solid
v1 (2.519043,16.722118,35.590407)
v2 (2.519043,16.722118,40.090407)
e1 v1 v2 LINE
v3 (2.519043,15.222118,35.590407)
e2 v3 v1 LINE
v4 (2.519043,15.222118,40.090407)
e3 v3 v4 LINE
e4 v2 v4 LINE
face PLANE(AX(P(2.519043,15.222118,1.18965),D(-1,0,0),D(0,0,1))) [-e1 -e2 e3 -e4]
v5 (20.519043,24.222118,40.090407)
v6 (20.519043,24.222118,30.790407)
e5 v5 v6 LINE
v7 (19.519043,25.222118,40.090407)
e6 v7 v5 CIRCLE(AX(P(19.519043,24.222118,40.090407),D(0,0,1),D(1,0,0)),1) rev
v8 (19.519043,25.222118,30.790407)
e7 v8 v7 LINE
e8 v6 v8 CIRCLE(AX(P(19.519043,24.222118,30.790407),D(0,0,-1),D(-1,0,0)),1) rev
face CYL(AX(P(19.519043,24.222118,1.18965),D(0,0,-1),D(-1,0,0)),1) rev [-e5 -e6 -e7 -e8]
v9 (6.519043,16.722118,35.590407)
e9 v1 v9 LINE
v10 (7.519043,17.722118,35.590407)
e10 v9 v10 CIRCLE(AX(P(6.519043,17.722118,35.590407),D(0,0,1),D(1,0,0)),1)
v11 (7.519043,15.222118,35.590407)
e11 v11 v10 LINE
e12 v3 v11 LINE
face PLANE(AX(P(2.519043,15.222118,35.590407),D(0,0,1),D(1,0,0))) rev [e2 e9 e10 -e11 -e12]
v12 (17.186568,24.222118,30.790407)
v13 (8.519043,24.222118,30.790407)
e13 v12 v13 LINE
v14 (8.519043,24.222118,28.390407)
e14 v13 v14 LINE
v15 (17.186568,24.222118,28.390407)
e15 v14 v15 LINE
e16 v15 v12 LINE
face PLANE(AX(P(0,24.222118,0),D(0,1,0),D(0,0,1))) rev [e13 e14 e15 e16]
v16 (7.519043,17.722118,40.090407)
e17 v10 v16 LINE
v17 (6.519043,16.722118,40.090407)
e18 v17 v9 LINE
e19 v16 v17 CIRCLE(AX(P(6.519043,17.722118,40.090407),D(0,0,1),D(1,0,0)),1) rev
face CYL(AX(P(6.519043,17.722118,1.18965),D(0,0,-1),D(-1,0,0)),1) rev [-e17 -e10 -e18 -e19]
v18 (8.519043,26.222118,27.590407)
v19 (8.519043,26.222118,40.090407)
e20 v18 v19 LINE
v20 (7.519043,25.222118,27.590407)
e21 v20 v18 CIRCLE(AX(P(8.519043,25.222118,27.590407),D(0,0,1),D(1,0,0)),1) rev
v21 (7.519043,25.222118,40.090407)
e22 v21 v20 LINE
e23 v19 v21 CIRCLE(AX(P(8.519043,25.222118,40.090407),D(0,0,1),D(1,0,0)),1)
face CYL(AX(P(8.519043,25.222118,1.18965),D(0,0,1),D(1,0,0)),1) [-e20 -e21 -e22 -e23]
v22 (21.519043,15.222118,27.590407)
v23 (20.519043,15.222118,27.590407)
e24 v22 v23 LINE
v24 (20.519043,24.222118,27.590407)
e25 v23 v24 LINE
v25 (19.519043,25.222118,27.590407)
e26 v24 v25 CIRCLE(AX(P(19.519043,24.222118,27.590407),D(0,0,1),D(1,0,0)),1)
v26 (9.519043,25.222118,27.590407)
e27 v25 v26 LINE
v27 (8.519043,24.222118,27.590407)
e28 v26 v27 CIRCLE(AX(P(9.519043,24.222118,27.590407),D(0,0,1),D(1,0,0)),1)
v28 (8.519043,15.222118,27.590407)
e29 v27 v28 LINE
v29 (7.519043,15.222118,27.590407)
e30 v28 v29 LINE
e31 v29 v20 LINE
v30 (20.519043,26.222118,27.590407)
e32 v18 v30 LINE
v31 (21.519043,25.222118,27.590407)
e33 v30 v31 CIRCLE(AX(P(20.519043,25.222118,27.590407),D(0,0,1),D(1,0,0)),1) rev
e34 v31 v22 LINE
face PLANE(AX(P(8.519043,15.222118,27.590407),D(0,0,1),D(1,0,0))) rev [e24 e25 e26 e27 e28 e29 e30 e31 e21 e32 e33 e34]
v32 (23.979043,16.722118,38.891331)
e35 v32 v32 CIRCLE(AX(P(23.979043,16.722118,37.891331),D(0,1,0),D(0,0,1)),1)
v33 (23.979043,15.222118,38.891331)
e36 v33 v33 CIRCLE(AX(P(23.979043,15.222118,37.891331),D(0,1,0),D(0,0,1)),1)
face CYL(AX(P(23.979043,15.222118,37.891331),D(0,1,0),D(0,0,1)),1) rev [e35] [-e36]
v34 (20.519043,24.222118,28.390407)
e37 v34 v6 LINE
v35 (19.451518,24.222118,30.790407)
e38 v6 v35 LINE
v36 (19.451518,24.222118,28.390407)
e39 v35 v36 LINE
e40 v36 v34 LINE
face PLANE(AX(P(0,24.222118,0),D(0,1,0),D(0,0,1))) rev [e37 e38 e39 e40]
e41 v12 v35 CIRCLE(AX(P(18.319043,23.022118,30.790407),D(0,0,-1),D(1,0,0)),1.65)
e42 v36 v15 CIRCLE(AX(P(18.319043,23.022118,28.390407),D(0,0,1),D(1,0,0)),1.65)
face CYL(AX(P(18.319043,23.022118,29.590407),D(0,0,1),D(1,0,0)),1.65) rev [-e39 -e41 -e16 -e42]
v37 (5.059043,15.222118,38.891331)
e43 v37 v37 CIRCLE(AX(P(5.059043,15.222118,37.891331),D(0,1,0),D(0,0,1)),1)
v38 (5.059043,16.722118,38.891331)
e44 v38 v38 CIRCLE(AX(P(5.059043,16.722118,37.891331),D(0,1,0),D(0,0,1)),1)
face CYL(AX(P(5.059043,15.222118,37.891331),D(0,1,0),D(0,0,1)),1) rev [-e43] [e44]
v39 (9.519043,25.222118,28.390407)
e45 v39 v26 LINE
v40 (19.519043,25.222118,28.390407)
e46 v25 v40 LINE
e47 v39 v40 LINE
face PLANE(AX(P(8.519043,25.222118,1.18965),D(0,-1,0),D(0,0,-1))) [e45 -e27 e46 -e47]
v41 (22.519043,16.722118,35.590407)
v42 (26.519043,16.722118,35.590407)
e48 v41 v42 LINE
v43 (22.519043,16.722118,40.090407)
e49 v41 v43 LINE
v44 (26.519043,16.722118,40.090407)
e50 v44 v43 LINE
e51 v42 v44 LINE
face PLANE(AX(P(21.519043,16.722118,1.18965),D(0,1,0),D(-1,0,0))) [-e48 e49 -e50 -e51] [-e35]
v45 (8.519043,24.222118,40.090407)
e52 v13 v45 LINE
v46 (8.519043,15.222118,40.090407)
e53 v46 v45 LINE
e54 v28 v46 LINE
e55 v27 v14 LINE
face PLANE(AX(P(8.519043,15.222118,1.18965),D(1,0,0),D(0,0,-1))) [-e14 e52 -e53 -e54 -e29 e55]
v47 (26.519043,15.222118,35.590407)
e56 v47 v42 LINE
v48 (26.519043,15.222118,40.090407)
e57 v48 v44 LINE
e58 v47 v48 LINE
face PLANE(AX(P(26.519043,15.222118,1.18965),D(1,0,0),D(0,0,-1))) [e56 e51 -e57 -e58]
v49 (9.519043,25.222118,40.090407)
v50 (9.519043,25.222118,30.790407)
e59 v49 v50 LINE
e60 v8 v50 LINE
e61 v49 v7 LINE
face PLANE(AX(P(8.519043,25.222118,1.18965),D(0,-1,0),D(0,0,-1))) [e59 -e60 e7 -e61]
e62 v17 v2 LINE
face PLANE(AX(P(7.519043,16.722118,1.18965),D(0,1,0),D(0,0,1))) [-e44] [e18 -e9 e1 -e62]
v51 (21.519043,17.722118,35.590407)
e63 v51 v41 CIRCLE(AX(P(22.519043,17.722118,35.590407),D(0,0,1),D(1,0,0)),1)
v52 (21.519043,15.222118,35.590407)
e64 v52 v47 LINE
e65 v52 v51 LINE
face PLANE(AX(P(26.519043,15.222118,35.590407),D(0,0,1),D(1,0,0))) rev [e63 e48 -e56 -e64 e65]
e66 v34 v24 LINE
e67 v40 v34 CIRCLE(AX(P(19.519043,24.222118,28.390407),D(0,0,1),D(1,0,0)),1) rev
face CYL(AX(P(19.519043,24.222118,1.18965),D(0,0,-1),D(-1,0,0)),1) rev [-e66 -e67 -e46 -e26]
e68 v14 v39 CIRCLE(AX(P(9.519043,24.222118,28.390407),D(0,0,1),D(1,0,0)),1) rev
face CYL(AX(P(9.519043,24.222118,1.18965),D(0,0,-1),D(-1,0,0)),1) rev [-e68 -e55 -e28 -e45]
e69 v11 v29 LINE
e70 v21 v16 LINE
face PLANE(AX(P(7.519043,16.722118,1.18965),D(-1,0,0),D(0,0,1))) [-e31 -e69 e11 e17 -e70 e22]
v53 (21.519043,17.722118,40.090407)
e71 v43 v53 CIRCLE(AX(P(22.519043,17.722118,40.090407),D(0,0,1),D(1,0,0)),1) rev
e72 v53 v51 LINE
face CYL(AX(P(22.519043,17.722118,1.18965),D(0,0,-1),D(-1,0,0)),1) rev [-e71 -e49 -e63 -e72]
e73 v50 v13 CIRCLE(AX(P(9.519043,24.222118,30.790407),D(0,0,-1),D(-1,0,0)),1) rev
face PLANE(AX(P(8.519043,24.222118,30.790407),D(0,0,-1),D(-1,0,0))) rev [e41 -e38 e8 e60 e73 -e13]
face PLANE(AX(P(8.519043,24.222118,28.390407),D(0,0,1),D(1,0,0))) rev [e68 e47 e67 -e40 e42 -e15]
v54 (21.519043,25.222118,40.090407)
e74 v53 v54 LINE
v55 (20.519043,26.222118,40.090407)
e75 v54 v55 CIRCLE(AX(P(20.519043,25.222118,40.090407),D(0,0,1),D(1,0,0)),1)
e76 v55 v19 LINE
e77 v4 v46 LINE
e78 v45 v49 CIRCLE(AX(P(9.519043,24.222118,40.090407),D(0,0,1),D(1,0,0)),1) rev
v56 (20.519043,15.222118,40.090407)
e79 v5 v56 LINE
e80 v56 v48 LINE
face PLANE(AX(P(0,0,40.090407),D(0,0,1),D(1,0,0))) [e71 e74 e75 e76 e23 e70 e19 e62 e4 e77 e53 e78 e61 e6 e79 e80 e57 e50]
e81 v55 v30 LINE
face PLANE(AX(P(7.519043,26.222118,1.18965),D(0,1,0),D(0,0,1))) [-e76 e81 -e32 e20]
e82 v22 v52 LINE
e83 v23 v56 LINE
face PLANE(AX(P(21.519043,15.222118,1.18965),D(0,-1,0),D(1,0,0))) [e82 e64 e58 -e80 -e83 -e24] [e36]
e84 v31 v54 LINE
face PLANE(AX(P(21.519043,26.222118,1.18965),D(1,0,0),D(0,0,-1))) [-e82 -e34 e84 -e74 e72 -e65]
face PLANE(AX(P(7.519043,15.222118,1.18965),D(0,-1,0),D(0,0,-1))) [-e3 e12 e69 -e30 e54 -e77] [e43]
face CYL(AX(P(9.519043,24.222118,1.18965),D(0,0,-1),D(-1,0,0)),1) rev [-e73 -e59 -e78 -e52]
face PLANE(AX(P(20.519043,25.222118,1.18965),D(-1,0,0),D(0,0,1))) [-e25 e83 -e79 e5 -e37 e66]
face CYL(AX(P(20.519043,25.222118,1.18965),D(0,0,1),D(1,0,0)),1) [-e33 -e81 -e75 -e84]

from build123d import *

# Parameters (mm, degrees)
BOSS_EXTRUDE1_DEPTH = 12.5
SKETCH3_R           = 1
CUT_EXTRUDE1_DEPTH  = 49.99745314
FILLET1_R           = 1
SKETCH4_W           = 12
SKETCH4_H           = 2.4
BOSS_EXTRUDE2_DEPTH = 1
CAVITY2_START       = 28.390407362
CAVITY2_DEPTH       = 2.4
FILLET2_R           = 1
SKETCH5_W           = 5
SKETCH5_H           = 8
CUT_EXTRUDE2_DEPTH  = 49.99745314
FILLET3_R           = 1


# Read off the part's stored shape, not the designer's step: Cavity2
with BuildPart() as part:
    # Sketch2 → Boss-Extrude1 (new body)
    with BuildSketch(Plane.XY.offset(40.090407362)):
        Polygon((8.51904319, 15.222118346), (8.51904319, 25.222118346), (20.51904319, 25.222118346), (20.51904319, 15.222118346), (21.51904319, 15.222118346), (26.51904319, 15.222118346), (26.51904319, 16.722118346), (21.51904319, 16.722118346), (21.51904319, 26.222118346), (7.51904319, 26.222118346), (7.51904319, 16.722118346), (2.51904319, 16.722118346), (2.51904319, 15.222118346), (7.51904319, 15.222118346), align=None)
    extrude(amount=-BOSS_EXTRUDE1_DEPTH)

    # Sketch3 → Cut-Extrude1 (cut, through all)
    with BuildSketch(Plane(origin=(0, 16.722118346, 0), x_dir=(1, 0, 0), z_dir=(0, 1, 0))):
        with Locations(Location((5.05904319, -37.891330821, 0), (0, 0, 270))):
            Circle(SKETCH3_R)
        with Locations(Location((23.97904319, -37.891330821, 0), (0, 0, 270))):
            Circle(SKETCH3_R)
    extrude(amount=-CUT_EXTRUDE1_DEPTH, mode=Mode.SUBTRACT)

    # Fillet1
    fillet1_edges = [part.edges().sort_by_distance(p)[0] for p in [
        (8.51904319, 25.222118346, 33.840407362),
        (20.51904319, 25.222118346, 33.840407362),
    ]]
    fillet(fillet1_edges, radius=FILLET1_R)

    # Sketch4 → Boss-Extrude2 (add)
    with BuildSketch(Plane.XZ.offset(-25.222118346)):
        with Locations((14.51904319, 29.590407362)):
            Rectangle(SKETCH4_W, SKETCH4_H)
    extrude(amount=BOSS_EXTRUDE2_DEPTH)

    # Cavity2 outline → Cavity2 (cut)
    with BuildSketch(Plane.XY.offset(CAVITY2_START)):
        with BuildLine():
            Line((17.186568025, 24.222118346), (19.451518355, 24.222118346))
            ThreePointArc((19.451518355, 24.222118346), (18.31904319, 24.672118346), (17.186568025, 24.222118346))
        make_face()
    extrude(amount=CAVITY2_DEPTH, mode=Mode.SUBTRACT)

    # Fillet2
    fillet2_edges = [part.edges().sort_by_distance(p)[0] for p in [
        (21.51904319, 26.222118346, 33.840407362),
        (7.51904319, 26.222118346, 33.840407362),
    ]]
    fillet(fillet2_edges, radius=FILLET2_R)

    # Sketch5 → Cut-Extrude2 (cut, through all)
    with BuildSketch(Plane(origin=(0, 16.722118346, 0), x_dir=(1, 0, 0), z_dir=(0, 1, 0))):
        with Locations((5.01904319, -31.590407362)):
            Rectangle(SKETCH5_W, SKETCH5_H)
        with Locations((24.01904319, -31.590407362)):
            Rectangle(SKETCH5_W, SKETCH5_H)
    extrude(amount=-CUT_EXTRUDE2_DEPTH, mode=Mode.SUBTRACT)

    # Fillet3
    fillet3_edges = [part.edges().sort_by_distance(p)[0] for p in [
        (21.51904319, 16.722118346, 37.840407362),
        (7.51904319, 16.722118346, 37.840407362),
    ]]
    fillet(fillet3_edges, radius=FILLET3_R)


solid = part.part
